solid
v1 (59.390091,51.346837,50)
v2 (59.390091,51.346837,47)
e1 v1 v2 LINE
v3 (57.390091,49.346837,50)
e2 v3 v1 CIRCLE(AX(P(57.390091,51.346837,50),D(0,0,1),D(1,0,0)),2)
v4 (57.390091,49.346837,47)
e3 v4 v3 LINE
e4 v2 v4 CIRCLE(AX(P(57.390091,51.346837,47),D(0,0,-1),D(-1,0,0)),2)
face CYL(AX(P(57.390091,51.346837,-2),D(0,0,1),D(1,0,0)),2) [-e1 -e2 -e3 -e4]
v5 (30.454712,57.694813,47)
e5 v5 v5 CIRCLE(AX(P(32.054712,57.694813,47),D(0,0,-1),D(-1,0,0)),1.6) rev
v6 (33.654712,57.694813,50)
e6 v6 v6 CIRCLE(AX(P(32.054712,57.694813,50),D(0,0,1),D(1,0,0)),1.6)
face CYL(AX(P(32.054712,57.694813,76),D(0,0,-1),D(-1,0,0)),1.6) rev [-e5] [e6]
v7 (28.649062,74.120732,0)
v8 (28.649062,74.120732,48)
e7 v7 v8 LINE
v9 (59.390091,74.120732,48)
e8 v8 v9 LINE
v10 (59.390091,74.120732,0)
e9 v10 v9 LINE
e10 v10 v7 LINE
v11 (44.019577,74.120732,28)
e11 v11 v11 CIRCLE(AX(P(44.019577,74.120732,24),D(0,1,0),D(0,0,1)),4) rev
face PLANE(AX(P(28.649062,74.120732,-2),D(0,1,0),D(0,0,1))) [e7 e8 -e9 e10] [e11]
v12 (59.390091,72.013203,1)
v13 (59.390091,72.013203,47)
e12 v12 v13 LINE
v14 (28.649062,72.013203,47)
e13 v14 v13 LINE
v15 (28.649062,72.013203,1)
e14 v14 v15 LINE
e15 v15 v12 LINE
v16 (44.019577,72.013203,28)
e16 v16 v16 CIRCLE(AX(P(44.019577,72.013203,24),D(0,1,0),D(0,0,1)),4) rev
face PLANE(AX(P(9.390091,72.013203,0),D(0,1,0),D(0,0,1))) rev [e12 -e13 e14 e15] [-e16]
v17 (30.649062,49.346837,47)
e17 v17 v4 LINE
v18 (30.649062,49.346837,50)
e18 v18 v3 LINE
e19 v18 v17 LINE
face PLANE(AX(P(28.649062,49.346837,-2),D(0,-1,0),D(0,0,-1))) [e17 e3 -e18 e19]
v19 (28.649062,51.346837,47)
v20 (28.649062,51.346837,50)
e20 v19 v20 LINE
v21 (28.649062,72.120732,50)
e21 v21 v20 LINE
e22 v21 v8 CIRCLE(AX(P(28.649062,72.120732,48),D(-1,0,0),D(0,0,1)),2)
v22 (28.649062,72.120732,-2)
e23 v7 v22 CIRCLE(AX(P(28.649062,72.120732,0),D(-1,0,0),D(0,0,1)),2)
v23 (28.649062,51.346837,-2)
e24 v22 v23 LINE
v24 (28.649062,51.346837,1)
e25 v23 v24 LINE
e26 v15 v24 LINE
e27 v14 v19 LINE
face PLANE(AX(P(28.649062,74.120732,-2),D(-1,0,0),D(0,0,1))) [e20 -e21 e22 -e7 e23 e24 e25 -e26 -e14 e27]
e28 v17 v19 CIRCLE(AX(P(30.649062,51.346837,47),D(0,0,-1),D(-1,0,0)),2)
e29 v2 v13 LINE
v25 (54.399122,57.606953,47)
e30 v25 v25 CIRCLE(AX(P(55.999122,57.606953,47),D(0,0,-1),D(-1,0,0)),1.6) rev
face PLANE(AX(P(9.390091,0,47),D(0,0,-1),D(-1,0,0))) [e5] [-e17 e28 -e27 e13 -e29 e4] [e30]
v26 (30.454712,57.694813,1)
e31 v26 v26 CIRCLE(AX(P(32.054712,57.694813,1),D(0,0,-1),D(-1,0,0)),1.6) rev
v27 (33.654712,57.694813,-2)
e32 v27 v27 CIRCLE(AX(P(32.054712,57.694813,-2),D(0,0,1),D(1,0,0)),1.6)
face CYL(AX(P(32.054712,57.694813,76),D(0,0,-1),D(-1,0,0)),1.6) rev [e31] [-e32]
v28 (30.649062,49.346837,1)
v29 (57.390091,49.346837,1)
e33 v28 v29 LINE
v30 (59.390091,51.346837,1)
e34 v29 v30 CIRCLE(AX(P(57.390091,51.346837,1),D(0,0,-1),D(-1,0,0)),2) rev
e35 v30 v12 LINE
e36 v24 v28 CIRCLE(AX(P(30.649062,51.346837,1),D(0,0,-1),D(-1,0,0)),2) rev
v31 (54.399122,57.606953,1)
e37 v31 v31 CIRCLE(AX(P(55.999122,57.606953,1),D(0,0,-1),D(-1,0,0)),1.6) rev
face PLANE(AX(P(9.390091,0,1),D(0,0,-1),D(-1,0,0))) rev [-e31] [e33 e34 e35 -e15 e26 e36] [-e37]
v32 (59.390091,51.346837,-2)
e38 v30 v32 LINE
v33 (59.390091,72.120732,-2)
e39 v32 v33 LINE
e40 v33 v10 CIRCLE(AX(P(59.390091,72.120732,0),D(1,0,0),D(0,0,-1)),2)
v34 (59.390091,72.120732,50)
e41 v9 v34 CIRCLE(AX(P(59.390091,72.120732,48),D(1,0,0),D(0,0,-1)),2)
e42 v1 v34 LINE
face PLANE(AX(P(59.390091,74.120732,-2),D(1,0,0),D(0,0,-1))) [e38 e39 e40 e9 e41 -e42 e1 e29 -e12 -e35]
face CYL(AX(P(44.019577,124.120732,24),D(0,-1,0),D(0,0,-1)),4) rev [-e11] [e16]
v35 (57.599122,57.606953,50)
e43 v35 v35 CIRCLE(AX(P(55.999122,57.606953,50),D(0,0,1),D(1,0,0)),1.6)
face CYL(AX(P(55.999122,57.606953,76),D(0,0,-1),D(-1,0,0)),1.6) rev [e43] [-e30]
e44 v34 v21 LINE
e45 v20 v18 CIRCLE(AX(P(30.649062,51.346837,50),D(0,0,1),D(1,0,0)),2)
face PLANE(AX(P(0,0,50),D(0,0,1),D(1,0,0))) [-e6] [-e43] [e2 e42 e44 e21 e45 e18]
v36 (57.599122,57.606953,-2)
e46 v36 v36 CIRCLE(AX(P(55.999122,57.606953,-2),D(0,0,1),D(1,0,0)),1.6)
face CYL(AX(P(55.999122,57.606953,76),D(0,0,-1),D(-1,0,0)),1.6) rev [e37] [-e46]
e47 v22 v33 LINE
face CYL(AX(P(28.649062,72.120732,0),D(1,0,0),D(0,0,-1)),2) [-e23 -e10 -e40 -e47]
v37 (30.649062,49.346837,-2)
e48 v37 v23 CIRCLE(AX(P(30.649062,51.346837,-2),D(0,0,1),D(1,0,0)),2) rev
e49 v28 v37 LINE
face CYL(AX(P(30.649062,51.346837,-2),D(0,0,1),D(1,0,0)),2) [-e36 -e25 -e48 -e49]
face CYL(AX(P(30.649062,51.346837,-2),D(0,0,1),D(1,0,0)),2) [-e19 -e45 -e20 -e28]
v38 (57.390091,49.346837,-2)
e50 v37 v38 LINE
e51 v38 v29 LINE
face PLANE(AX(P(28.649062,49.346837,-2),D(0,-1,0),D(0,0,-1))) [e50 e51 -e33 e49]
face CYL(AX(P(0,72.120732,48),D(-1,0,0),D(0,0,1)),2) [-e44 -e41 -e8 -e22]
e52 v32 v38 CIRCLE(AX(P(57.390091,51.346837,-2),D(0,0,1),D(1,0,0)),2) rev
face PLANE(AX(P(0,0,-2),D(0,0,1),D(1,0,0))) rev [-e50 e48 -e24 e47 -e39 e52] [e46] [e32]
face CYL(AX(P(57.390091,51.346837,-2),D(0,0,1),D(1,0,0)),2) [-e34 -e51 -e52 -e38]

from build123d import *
from build123d.topology import SkipClean

# Parameters (mm, degrees)
SKETCH_1_W               = 30
SKETCH_1_H               = 65
EXTRUDE_1_DEPTH          = 48
SKETCH_2_R               = 1
CUT_EXTRUDE_1_DEPTH      = 48
EXTRUDE_2_DEPTH          = 5
EXTRUDE_2_DEPTH_BACK     = 53
SKETCH_3_R               = 3
CHAMFER_1_SIZE           = 2
FILLET_1_R               = 1
FILLET_2_R               = 1
SKETCH_6_R               = 1.6
CUT_EXTRUDE_3_DEPTH      = 76
EXTRUDE_3_DEPTH          = 50
EXTRUDE_3_DEPTH_BACK     = 2
SKETCH_7_W               = 30.741029275
SKETCH_7_H               = 24.773895079
SKETCH_7_R               = 1.6
CUT_EXTRUDE_START        = -30.741029275
CUT_EXTRUDE_4_DEPTH      = 30.741029275
CUT_EXTRUDE_5_DEPTH      = 50
CUT_EXTRUDE_5_DEPTH_BACK = 50
SKETCH_9_R               = 4
FILLET_3_R               = 2


# Read off the part's stored shape, not the designer's step: ｶｯﾄ - 押し出し4
with BuildPart() as part:
    # ｽｹｯﾁ1 → ﾎﾞｽ - 押し出し1 (new body)
    with BuildSketch(Plane.XY):
        with Locations((44.026916893, 39.150883092)):
            Rectangle(SKETCH_1_W, SKETCH_1_H)
    extrude(amount=EXTRUDE_1_DEPTH)

    # ｽｹｯﾁ2 → ｶｯﾄ - 押し出し1 (cut)
    with BuildSketch(Plane.XY):
        with Locations((56.026916893, 57.650883092)):
            Circle(SKETCH_2_R)
        with Locations((44.026916893, 57.650883092)):
            Circle(SKETCH_2_R)
        with Locations((56.023819064, 45.923533591)):
            Circle(SKETCH_2_R)
        with Locations((32.026916893, 57.650883092)):
            Circle(SKETCH_2_R)
        with Locations(Location((32.030014722, 45.923533591, 0), (0, 0, 180))):
            Circle(SKETCH_2_R)
    extrude(amount=CUT_EXTRUDE_1_DEPTH, mode=Mode.SUBTRACT)

    # ｽｹｯﾁ3 → ﾎﾞｽ - 押し出し2 (add, two sides: drawn at the far end of the back side and taken through both)
    with BuildSketch(Plane(origin=(0, 0, 0), x_dir=(-1, 0, 0), z_dir=(0, 0, -1)).offset(-EXTRUDE_2_DEPTH_BACK)):
        with Locations((-44.026916893, 18.650883092)):
            Circle(SKETCH_3_R)
    extrude(amount=EXTRUDE_2_DEPTH + EXTRUDE_2_DEPTH_BACK)

    # 面取り1
    chamfer_1_edges = [part.edges().sort_by_distance(p)[0] for p in [
        (29.026916893, 71.650883092, 24),
        (59.026916893, 71.650883092, 24),
        (59.026916893, 6.650883092, 24),
        (29.026916893, 6.650883092, 24),
    ]]
    chamfer(chamfer_1_edges, length=CHAMFER_1_SIZE)

    # ﾌｨﾚｯﾄ1
    fillet_1_edges = [part.edges().sort_by_distance(p)[0] for p in [
        (44.026916893, 6.650883092, 48),
        (29.026916893, 39.150883092, 48),
        (59.026916893, 39.150883092, 48),
        (44.026916893, 71.650883092, 48),
        (30.026916893, 70.650883092, 48),
        (58.026916893, 70.650883092, 48),
        (58.026916893, 7.650883092, 48),
        (30.026916893, 7.650883092, 48),
    ]]
    fillet(fillet_1_edges, radius=FILLET_1_R)

    # ﾌｨﾚｯﾄ2
    fillet_2_edges = [part.edges().sort_by_distance(p)[0] for p in [
        (44.026916893, 6.650883092, 0),
        (29.026916893, 39.150883092, 0),
        (44.026916893, 71.650883092, 0),
        (59.026916893, 39.150883092, 0),
        (30.026916893, 70.650883092, 0),
        (58.026916893, 70.650883092, 0),
        (58.026916893, 7.650883092, 0),
        (30.026916893, 7.650883092, 0),
    ]]
    fillet(fillet_2_edges, radius=FILLET_2_R)

    # ｽｹｯﾁ6 → ｶｯﾄ - 押し出し3 (cut)
    with BuildSketch(Plane(origin=(0, 0, 0), x_dir=(-1, 0, 0), z_dir=(0, 0, -1))):
        with Locations((-55.99912174, 57.606952707)):
            Circle(SKETCH_6_R)
        with Locations((-32.054712046, 57.694813478)):
            Circle(SKETCH_6_R)
        with Locations((-55.99912174, 45.879603206)):
            Circle(SKETCH_6_R)
        with Locations((-32.054712046, 45.967463976)):
            Circle(SKETCH_6_R)
    extrude(amount=-CUT_EXTRUDE_3_DEPTH, mode=Mode.SUBTRACT)

    # ｽｹｯﾁ7 → ﾎﾞｽ - 押し出し3 (add, two sides: drawn at the far end of the back side and taken through both)
    with SkipClean():  # the faces are left unmerged after this step: merging them gives an invalid solid
        with BuildSketch(Plane.XY.offset(-EXTRUDE_3_DEPTH_BACK)):
            with Locations((44.019576577, 61.733784516)):
                Rectangle(SKETCH_7_W, SKETCH_7_H)
            with Locations((32.054712046, 57.694813478)):
                Circle(SKETCH_7_R, mode=Mode.SUBTRACT)
            with Locations((55.99912174, 57.606952707)):
                Circle(SKETCH_7_R, mode=Mode.SUBTRACT)
        extrude(amount=EXTRUDE_3_DEPTH + EXTRUDE_3_DEPTH_BACK)

    # ｶｯﾄ - 押し出し4 outline → ｶｯﾄ - 押し出し4 (cut)
    with SkipClean():  # the faces are left unmerged after this step: merging them gives an invalid solid
        with BuildSketch(Plane(origin=(59.390091214, 0, 0), x_dir=(0, 0, -1), z_dir=(1, 0, 0)).offset(CUT_EXTRUDE_START)):
            Polygon((-1, 49.346836976), (-1, 72.013202711), (-47, 72.013202711), (-47, 49.346836976), (-48, 49.346836976), (-48, 45.206300999), (-57.188140565, 45.206300999), (-57.188140565, 1.456905632), (13.746291121, 1.456905632), (13.746291121, 49.346836976), align=None)
        extrude(amount=CUT_EXTRUDE_4_DEPTH, mode=Mode.SUBTRACT)

    # ｽｹｯﾁ9 → ｶｯﾄ - 押し出し5 (cut, two sides: drawn at the far end of the back side and taken through both)
    with SkipClean():  # the faces are left unmerged after this step: merging them gives an invalid solid
        with BuildSketch(Plane(origin=(0, 74.120732055, 0), x_dir=(1, 0, 0), z_dir=(0, 1, 0)).offset(-CUT_EXTRUDE_5_DEPTH_BACK)):
            with Locations(Location((44.019576577, -24, 0), (0, 0, 270))):
                Circle(SKETCH_9_R)
        extrude(amount=CUT_EXTRUDE_5_DEPTH + CUT_EXTRUDE_5_DEPTH_BACK, mode=Mode.SUBTRACT)

    # ﾌｨﾚｯﾄ3
    fillet_3_edges = [part.edges().sort_by_distance(p)[0] for p in [
        (28.649061939, 49.346836976, -0.5),
        (44.019576577, 74.120732055, -2),
        (59.390091214, 49.346836976, -0.5),
        (44.019576577, 74.120732055, 50),
        (59.390091214, 49.346836976, 49),
        (28.649061939, 49.346836976, 49),
    ]]
    fillet(fillet_3_edges, radius=FILLET_3_R)


solid = part.part
